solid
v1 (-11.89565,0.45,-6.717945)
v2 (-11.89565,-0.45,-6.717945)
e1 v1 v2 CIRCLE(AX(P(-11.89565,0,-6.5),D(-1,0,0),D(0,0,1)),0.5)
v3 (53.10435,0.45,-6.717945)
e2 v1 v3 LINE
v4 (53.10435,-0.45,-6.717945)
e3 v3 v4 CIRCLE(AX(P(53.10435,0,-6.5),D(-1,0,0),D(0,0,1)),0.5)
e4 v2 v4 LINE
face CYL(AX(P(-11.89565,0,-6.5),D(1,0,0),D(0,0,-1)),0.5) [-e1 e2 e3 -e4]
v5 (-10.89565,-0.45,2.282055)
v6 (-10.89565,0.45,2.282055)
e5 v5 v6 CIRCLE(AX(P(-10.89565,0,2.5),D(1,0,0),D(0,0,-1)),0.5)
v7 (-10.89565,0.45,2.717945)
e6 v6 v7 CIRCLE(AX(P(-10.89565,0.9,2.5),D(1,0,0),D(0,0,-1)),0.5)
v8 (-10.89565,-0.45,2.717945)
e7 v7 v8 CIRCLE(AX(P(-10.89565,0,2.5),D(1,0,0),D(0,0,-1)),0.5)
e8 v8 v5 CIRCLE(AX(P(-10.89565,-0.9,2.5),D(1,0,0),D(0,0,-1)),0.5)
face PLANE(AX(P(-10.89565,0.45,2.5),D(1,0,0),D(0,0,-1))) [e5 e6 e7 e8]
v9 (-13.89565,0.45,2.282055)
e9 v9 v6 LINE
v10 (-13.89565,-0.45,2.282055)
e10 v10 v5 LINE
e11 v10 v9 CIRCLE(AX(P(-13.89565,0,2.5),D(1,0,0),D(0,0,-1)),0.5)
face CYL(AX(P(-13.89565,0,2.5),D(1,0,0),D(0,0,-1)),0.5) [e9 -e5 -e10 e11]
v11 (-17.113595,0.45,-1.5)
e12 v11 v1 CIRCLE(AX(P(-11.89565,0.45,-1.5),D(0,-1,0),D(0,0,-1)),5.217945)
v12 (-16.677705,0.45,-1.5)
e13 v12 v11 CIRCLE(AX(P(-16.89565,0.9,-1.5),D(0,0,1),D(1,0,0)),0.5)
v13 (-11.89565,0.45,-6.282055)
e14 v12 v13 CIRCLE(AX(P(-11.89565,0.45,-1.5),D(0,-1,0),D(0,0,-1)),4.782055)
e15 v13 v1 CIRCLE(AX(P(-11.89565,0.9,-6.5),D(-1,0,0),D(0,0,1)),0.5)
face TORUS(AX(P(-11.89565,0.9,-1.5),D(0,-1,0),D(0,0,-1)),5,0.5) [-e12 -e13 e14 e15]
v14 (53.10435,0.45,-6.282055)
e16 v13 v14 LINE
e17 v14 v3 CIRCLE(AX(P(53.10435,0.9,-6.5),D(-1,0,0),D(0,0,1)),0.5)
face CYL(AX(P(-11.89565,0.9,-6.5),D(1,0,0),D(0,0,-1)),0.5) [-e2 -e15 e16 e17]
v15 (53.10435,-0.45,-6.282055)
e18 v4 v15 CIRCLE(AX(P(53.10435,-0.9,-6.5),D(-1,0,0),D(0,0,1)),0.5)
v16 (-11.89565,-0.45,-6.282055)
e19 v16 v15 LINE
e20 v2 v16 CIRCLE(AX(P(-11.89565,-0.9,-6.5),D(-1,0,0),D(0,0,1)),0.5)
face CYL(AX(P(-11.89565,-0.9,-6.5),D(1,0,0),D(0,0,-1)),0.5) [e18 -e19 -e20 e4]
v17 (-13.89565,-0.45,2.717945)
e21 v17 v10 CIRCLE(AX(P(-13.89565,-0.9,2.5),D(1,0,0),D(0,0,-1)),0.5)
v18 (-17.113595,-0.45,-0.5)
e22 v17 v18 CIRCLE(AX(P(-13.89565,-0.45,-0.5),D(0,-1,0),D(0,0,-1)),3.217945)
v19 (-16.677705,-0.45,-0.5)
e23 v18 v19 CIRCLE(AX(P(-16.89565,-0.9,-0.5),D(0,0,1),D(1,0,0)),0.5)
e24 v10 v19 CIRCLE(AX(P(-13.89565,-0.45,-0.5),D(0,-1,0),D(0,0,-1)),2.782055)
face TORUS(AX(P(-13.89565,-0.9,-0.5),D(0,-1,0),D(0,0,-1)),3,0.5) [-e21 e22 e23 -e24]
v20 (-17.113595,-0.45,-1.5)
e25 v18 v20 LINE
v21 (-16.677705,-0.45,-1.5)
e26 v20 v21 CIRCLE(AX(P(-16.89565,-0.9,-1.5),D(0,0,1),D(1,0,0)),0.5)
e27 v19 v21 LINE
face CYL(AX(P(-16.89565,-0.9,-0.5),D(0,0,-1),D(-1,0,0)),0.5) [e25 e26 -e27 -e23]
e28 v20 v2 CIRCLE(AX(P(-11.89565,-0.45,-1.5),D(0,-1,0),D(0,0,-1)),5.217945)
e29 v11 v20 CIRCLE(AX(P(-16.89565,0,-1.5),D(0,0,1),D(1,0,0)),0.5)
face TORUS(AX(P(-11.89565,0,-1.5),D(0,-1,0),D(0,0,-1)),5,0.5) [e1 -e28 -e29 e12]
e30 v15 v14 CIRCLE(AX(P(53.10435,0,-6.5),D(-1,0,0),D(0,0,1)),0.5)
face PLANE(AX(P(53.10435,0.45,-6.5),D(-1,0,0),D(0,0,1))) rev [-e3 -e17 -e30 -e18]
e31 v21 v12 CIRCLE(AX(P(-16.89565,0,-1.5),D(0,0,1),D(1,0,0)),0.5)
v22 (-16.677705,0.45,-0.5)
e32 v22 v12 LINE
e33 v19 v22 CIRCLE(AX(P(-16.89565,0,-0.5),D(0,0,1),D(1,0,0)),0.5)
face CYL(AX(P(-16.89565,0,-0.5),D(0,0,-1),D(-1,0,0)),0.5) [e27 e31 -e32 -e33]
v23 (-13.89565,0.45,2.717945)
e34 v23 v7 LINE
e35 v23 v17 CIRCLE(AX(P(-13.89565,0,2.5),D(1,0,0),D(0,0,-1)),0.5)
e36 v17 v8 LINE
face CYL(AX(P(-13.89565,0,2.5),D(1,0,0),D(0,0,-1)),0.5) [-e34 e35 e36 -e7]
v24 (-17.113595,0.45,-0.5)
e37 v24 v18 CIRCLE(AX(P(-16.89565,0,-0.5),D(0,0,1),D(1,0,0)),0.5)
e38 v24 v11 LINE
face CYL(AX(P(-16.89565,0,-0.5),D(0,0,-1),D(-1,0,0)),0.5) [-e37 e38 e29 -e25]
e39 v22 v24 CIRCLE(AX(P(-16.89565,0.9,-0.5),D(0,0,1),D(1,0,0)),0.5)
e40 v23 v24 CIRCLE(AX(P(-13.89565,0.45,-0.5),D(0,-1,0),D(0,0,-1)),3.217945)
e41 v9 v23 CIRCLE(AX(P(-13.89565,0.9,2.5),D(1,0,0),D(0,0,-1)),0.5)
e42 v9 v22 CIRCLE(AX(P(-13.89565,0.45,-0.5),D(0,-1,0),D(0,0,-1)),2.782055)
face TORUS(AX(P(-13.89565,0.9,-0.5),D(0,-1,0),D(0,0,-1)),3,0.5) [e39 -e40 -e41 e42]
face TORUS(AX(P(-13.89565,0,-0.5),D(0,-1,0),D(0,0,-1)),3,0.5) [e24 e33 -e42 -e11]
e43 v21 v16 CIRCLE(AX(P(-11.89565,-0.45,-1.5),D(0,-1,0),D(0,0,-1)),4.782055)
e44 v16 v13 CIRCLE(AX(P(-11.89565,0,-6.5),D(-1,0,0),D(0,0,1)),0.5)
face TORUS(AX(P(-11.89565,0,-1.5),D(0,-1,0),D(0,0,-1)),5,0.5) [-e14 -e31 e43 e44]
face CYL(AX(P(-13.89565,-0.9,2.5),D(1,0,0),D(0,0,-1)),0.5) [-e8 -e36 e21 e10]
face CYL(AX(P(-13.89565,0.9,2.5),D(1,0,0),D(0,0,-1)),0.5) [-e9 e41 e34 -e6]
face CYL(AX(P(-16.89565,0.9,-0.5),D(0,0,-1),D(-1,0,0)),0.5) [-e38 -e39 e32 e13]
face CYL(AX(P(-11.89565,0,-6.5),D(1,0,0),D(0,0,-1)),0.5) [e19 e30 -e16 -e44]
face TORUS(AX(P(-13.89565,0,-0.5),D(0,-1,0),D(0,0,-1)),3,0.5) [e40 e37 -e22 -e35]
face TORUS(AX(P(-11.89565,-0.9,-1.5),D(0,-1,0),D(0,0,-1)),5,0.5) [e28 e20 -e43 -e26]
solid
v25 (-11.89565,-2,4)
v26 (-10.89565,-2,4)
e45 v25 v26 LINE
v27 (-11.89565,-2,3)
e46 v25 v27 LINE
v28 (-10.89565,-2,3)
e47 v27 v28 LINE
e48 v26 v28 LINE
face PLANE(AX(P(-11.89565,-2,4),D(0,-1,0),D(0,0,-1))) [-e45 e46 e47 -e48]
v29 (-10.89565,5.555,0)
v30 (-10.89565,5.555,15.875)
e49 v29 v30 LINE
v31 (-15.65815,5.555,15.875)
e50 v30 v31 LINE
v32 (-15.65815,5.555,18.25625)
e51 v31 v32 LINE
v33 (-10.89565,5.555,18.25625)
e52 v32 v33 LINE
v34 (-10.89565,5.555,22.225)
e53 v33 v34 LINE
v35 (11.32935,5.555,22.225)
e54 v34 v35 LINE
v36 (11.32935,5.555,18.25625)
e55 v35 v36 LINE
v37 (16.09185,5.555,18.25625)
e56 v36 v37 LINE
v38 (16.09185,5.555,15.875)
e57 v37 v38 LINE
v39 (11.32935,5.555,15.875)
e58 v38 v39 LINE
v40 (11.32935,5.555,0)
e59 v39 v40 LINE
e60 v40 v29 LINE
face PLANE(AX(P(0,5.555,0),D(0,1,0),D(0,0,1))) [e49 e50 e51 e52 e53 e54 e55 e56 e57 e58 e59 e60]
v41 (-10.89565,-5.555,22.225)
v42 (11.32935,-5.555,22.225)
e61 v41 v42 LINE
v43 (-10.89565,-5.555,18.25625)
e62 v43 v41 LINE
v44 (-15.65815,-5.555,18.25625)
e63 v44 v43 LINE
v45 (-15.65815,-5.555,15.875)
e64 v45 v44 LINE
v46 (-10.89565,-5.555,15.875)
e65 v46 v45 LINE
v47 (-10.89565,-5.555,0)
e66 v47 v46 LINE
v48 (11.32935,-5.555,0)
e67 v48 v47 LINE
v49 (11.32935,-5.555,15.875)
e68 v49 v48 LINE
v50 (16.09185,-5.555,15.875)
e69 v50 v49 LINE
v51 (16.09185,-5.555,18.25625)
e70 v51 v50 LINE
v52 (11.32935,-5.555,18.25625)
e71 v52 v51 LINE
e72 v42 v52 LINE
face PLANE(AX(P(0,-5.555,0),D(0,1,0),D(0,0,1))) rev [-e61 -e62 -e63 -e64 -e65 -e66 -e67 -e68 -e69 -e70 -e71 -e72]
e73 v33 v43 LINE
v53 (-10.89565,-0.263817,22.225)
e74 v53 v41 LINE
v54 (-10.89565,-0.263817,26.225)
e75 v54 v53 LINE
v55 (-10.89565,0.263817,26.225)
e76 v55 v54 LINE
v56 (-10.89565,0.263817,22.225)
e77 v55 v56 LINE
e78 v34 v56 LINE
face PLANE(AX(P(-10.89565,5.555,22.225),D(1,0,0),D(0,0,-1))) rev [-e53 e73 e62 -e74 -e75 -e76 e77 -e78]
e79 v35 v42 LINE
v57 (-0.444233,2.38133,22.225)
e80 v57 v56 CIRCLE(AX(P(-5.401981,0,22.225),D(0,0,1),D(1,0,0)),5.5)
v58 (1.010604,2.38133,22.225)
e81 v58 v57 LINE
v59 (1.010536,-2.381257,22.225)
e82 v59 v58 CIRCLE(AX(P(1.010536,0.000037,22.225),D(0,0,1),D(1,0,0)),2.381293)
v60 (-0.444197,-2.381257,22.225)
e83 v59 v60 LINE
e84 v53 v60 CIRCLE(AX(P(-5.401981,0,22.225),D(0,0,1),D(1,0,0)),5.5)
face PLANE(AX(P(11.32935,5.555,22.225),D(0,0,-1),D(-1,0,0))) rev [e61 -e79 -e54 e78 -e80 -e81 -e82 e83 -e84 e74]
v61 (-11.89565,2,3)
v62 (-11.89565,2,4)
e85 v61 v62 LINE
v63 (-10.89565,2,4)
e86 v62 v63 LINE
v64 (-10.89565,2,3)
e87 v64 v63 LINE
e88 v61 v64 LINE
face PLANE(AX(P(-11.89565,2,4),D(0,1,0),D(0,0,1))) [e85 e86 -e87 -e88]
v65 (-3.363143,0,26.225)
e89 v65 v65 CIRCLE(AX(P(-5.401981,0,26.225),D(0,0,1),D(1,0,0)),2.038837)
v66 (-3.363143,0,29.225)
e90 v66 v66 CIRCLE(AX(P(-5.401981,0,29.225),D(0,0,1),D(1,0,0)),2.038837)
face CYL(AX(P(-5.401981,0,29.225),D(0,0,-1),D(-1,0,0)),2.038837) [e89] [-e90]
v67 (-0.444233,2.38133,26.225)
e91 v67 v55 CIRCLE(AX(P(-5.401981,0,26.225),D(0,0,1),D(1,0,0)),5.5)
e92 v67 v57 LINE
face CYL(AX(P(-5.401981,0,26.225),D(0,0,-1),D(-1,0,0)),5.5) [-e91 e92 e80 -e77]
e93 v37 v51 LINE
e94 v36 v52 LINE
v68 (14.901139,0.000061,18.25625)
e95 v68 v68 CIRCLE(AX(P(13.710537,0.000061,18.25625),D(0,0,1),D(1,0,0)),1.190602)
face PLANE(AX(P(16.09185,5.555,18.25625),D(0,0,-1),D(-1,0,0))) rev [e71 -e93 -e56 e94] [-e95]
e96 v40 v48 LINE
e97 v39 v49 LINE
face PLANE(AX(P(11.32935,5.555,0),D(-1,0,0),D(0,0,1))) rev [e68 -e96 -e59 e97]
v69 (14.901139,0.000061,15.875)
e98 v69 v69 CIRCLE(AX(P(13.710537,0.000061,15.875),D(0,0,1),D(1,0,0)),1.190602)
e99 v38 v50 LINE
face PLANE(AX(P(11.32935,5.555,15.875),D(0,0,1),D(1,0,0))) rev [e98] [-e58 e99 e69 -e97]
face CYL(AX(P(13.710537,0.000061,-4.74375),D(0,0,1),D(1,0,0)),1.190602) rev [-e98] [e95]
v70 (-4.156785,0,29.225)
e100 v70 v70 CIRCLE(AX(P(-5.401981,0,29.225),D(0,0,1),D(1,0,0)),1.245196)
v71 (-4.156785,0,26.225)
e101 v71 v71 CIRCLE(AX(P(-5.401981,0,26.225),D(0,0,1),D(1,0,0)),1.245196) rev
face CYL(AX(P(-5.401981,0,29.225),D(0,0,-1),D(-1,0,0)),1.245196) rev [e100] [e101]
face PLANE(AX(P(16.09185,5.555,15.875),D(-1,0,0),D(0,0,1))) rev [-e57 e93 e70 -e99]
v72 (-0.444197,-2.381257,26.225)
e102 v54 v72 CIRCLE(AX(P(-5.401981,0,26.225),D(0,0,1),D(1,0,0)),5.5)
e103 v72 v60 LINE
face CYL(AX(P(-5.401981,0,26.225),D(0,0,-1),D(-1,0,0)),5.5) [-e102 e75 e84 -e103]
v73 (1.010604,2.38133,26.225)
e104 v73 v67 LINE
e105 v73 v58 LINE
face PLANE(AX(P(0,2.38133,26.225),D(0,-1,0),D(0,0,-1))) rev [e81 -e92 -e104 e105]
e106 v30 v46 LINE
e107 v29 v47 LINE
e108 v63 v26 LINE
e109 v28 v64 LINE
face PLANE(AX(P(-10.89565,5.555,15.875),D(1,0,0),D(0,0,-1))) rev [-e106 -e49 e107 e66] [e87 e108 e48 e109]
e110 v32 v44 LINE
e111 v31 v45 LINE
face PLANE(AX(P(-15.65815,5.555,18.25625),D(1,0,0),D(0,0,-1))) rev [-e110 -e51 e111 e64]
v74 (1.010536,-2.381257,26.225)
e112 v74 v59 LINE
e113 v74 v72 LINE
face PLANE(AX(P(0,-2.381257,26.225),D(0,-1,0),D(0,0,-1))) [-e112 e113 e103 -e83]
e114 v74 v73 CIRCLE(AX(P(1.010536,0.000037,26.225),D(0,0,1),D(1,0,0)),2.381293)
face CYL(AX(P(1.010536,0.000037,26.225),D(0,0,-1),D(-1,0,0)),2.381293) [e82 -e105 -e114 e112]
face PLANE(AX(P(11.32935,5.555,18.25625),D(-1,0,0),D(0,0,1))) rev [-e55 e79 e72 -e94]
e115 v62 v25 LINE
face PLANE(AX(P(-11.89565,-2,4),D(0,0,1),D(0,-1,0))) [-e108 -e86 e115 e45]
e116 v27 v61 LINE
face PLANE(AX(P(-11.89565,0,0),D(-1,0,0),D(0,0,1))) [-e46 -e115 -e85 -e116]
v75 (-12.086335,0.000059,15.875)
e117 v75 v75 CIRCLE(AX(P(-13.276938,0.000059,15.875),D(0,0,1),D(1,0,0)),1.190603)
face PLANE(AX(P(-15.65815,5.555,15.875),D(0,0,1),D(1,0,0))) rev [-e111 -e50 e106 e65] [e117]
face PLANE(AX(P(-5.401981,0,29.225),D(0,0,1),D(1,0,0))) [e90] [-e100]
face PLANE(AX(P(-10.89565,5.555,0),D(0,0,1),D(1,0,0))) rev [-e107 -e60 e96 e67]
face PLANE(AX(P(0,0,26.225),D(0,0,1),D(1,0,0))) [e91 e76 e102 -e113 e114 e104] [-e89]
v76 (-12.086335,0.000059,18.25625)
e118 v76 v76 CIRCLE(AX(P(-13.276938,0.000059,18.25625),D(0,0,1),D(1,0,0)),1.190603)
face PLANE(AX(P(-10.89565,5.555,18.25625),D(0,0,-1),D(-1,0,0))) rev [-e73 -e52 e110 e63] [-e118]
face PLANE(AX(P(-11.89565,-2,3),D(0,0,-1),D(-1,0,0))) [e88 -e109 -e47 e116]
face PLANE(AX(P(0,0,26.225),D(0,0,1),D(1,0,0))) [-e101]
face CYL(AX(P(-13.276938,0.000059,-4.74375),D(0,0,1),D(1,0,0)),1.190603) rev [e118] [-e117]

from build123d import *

# Parameters (mm, degrees)
P_IDAT_VYSUNUT_M1_DEPTH  = 5.555
P_IDAT_VYSUNUT_M2_DEPTH  = 4
SKICA3_R                 = 2.03883748
SKICA3_R_2               = 1.24519559
P_IDAT_VYSUNUT_M3_DEPTH  = 3
SKICA5_R                 = 1.190602913
SKICA5_R_2               = 1.19060243
ODEBRAT_VYSUNUT_M1_DEPTH = 23
SKICA7_W                 = 1
SKICA7_H                 = 4
P_IDAT_VYSUNUT_M4_DEPTH  = 1


# Read off the part's stored shape, not the designer's step: Přidat vysunutím2
with BuildPart() as part:
    # Skica1 → Přidat vysunutím1 (new, symmetric)
    with BuildSketch(Plane(origin=(0, 0, 0), x_dir=(1, 0, 0), z_dir=(0, 1, 0))):
        Polygon((11.32935, -15.875), (16.09185, -15.875), (16.09185, -18.25625), (11.32935, -18.25625), (11.32935, -22.225), (-10.89565, -22.225), (-10.89565, -18.25625), (-15.65815, -18.25625), (-15.65815, -15.875), (-10.89565, -15.875), (-10.89565, 0), (11.32935, 0), align=None)
    extrude(amount=P_IDAT_VYSUNUT_M1_DEPTH, both=True)

    # Přidat vysunutím2 outline → Přidat vysunutím2 (add)
    with BuildSketch(Plane.XY.offset(22.225)):
        with BuildLine():
            Line((-10.89565, 0.263816958), (-10.89565, -0.263816958))
            ThreePointArc((-10.89565, -0.263816958), (-6.494080203, -5.390484118), (-0.444197365, -2.381256561))
            Line((-0.444197365, -2.381256561), (1.010536018, -2.381256561))
            ThreePointArc((1.010536018, -2.381256561), (3.391829299, 2.729e-06), (1.010604, 2.38133))
            Line((1.010604, 2.38133), (-0.444232639, 2.38133))
            ThreePointArc((-0.444232639, 2.38133), (-6.494120128, 5.390476029), (-10.89565, 0.263816958))
        make_face()
    extrude(amount=P_IDAT_VYSUNUT_M2_DEPTH)

    # Skica3 → Přidat vysunutím3 (add)
    with BuildSketch(Plane.XY.offset(26.225)):
        with Locations((-5.401980861, 0)):
            Circle(SKICA3_R)
        with Locations((-5.401980861, 0)):
            Circle(SKICA3_R_2, mode=Mode.SUBTRACT)
    extrude(amount=P_IDAT_VYSUNUT_M3_DEPTH)

    # Skica5 → Odebrat vysunutím1 (cut)
    with BuildSketch(Plane.XY.offset(18.25625)):
        with Locations((-13.276937552, 5.8558e-05)):
            Circle(SKICA5_R)
        with Locations((13.71053658, 6.1415e-05)):
            Circle(SKICA5_R_2)
    extrude(amount=-ODEBRAT_VYSUNUT_M1_DEPTH, mode=Mode.SUBTRACT)

    # Skica7 → Přidat vysunutím4 (add)
    with BuildSketch(Plane(origin=(-10.89565, 0, 10.89565), x_dir=(0, 0, -1), z_dir=(1, 0, 0))):
        with Locations((7.39565, 0)):
            Rectangle(SKICA7_W, SKICA7_H)
    extrude(amount=-P_IDAT_VYSUNUT_M4_DEPTH)


with BuildPart() as body_2:
    # Táhnout po křivce3: sweep along a path in Skica9
    with BuildLine(Plane(origin=(0, 0, 0), x_dir=(1, 0, 0), z_dir=(0, 1, 0))) as t_hnout_po_k_ivce3_path:
        Line((-10.89565, -2.5), (-13.89565, -2.5))
        ThreePointArc((-13.89565, -2.5), (-16.016970344, -1.621320344), (-16.89565, 0.5))
        Line((-16.89565, 0.5), (-16.89565, 1.5))
        ThreePointArc((-16.89565, 1.5), (-15.431183906, 5.035533906), (-11.89565, 6.5))
        Line((-11.89565, 6.5), (53.10435, 6.5))
    # Skica8 → Táhnout po křivce3 (sweep)
    with BuildSketch(Plane(origin=(-10.89565, 0, 10.89565), x_dir=(0, 0, -1), z_dir=(1, 0, 0))):
        with BuildLine():
            ThreePointArc((8.177705053, 0.45), (7.89565, 0), (8.177705053, -0.45))
            ThreePointArc((8.177705053, -0.45), (8.39565, -1.4), (8.613594947, -0.45))
            ThreePointArc((8.613594947, -0.45), (8.89565, 0), (8.613594947, 0.45))
            ThreePointArc((8.613594947, 0.45), (8.39565, 1.4), (8.177705053, 0.45))
        make_face()
    sweep(path=t_hnout_po_k_ivce3_path.line)


solid = Compound([part.part, body_2.part])
